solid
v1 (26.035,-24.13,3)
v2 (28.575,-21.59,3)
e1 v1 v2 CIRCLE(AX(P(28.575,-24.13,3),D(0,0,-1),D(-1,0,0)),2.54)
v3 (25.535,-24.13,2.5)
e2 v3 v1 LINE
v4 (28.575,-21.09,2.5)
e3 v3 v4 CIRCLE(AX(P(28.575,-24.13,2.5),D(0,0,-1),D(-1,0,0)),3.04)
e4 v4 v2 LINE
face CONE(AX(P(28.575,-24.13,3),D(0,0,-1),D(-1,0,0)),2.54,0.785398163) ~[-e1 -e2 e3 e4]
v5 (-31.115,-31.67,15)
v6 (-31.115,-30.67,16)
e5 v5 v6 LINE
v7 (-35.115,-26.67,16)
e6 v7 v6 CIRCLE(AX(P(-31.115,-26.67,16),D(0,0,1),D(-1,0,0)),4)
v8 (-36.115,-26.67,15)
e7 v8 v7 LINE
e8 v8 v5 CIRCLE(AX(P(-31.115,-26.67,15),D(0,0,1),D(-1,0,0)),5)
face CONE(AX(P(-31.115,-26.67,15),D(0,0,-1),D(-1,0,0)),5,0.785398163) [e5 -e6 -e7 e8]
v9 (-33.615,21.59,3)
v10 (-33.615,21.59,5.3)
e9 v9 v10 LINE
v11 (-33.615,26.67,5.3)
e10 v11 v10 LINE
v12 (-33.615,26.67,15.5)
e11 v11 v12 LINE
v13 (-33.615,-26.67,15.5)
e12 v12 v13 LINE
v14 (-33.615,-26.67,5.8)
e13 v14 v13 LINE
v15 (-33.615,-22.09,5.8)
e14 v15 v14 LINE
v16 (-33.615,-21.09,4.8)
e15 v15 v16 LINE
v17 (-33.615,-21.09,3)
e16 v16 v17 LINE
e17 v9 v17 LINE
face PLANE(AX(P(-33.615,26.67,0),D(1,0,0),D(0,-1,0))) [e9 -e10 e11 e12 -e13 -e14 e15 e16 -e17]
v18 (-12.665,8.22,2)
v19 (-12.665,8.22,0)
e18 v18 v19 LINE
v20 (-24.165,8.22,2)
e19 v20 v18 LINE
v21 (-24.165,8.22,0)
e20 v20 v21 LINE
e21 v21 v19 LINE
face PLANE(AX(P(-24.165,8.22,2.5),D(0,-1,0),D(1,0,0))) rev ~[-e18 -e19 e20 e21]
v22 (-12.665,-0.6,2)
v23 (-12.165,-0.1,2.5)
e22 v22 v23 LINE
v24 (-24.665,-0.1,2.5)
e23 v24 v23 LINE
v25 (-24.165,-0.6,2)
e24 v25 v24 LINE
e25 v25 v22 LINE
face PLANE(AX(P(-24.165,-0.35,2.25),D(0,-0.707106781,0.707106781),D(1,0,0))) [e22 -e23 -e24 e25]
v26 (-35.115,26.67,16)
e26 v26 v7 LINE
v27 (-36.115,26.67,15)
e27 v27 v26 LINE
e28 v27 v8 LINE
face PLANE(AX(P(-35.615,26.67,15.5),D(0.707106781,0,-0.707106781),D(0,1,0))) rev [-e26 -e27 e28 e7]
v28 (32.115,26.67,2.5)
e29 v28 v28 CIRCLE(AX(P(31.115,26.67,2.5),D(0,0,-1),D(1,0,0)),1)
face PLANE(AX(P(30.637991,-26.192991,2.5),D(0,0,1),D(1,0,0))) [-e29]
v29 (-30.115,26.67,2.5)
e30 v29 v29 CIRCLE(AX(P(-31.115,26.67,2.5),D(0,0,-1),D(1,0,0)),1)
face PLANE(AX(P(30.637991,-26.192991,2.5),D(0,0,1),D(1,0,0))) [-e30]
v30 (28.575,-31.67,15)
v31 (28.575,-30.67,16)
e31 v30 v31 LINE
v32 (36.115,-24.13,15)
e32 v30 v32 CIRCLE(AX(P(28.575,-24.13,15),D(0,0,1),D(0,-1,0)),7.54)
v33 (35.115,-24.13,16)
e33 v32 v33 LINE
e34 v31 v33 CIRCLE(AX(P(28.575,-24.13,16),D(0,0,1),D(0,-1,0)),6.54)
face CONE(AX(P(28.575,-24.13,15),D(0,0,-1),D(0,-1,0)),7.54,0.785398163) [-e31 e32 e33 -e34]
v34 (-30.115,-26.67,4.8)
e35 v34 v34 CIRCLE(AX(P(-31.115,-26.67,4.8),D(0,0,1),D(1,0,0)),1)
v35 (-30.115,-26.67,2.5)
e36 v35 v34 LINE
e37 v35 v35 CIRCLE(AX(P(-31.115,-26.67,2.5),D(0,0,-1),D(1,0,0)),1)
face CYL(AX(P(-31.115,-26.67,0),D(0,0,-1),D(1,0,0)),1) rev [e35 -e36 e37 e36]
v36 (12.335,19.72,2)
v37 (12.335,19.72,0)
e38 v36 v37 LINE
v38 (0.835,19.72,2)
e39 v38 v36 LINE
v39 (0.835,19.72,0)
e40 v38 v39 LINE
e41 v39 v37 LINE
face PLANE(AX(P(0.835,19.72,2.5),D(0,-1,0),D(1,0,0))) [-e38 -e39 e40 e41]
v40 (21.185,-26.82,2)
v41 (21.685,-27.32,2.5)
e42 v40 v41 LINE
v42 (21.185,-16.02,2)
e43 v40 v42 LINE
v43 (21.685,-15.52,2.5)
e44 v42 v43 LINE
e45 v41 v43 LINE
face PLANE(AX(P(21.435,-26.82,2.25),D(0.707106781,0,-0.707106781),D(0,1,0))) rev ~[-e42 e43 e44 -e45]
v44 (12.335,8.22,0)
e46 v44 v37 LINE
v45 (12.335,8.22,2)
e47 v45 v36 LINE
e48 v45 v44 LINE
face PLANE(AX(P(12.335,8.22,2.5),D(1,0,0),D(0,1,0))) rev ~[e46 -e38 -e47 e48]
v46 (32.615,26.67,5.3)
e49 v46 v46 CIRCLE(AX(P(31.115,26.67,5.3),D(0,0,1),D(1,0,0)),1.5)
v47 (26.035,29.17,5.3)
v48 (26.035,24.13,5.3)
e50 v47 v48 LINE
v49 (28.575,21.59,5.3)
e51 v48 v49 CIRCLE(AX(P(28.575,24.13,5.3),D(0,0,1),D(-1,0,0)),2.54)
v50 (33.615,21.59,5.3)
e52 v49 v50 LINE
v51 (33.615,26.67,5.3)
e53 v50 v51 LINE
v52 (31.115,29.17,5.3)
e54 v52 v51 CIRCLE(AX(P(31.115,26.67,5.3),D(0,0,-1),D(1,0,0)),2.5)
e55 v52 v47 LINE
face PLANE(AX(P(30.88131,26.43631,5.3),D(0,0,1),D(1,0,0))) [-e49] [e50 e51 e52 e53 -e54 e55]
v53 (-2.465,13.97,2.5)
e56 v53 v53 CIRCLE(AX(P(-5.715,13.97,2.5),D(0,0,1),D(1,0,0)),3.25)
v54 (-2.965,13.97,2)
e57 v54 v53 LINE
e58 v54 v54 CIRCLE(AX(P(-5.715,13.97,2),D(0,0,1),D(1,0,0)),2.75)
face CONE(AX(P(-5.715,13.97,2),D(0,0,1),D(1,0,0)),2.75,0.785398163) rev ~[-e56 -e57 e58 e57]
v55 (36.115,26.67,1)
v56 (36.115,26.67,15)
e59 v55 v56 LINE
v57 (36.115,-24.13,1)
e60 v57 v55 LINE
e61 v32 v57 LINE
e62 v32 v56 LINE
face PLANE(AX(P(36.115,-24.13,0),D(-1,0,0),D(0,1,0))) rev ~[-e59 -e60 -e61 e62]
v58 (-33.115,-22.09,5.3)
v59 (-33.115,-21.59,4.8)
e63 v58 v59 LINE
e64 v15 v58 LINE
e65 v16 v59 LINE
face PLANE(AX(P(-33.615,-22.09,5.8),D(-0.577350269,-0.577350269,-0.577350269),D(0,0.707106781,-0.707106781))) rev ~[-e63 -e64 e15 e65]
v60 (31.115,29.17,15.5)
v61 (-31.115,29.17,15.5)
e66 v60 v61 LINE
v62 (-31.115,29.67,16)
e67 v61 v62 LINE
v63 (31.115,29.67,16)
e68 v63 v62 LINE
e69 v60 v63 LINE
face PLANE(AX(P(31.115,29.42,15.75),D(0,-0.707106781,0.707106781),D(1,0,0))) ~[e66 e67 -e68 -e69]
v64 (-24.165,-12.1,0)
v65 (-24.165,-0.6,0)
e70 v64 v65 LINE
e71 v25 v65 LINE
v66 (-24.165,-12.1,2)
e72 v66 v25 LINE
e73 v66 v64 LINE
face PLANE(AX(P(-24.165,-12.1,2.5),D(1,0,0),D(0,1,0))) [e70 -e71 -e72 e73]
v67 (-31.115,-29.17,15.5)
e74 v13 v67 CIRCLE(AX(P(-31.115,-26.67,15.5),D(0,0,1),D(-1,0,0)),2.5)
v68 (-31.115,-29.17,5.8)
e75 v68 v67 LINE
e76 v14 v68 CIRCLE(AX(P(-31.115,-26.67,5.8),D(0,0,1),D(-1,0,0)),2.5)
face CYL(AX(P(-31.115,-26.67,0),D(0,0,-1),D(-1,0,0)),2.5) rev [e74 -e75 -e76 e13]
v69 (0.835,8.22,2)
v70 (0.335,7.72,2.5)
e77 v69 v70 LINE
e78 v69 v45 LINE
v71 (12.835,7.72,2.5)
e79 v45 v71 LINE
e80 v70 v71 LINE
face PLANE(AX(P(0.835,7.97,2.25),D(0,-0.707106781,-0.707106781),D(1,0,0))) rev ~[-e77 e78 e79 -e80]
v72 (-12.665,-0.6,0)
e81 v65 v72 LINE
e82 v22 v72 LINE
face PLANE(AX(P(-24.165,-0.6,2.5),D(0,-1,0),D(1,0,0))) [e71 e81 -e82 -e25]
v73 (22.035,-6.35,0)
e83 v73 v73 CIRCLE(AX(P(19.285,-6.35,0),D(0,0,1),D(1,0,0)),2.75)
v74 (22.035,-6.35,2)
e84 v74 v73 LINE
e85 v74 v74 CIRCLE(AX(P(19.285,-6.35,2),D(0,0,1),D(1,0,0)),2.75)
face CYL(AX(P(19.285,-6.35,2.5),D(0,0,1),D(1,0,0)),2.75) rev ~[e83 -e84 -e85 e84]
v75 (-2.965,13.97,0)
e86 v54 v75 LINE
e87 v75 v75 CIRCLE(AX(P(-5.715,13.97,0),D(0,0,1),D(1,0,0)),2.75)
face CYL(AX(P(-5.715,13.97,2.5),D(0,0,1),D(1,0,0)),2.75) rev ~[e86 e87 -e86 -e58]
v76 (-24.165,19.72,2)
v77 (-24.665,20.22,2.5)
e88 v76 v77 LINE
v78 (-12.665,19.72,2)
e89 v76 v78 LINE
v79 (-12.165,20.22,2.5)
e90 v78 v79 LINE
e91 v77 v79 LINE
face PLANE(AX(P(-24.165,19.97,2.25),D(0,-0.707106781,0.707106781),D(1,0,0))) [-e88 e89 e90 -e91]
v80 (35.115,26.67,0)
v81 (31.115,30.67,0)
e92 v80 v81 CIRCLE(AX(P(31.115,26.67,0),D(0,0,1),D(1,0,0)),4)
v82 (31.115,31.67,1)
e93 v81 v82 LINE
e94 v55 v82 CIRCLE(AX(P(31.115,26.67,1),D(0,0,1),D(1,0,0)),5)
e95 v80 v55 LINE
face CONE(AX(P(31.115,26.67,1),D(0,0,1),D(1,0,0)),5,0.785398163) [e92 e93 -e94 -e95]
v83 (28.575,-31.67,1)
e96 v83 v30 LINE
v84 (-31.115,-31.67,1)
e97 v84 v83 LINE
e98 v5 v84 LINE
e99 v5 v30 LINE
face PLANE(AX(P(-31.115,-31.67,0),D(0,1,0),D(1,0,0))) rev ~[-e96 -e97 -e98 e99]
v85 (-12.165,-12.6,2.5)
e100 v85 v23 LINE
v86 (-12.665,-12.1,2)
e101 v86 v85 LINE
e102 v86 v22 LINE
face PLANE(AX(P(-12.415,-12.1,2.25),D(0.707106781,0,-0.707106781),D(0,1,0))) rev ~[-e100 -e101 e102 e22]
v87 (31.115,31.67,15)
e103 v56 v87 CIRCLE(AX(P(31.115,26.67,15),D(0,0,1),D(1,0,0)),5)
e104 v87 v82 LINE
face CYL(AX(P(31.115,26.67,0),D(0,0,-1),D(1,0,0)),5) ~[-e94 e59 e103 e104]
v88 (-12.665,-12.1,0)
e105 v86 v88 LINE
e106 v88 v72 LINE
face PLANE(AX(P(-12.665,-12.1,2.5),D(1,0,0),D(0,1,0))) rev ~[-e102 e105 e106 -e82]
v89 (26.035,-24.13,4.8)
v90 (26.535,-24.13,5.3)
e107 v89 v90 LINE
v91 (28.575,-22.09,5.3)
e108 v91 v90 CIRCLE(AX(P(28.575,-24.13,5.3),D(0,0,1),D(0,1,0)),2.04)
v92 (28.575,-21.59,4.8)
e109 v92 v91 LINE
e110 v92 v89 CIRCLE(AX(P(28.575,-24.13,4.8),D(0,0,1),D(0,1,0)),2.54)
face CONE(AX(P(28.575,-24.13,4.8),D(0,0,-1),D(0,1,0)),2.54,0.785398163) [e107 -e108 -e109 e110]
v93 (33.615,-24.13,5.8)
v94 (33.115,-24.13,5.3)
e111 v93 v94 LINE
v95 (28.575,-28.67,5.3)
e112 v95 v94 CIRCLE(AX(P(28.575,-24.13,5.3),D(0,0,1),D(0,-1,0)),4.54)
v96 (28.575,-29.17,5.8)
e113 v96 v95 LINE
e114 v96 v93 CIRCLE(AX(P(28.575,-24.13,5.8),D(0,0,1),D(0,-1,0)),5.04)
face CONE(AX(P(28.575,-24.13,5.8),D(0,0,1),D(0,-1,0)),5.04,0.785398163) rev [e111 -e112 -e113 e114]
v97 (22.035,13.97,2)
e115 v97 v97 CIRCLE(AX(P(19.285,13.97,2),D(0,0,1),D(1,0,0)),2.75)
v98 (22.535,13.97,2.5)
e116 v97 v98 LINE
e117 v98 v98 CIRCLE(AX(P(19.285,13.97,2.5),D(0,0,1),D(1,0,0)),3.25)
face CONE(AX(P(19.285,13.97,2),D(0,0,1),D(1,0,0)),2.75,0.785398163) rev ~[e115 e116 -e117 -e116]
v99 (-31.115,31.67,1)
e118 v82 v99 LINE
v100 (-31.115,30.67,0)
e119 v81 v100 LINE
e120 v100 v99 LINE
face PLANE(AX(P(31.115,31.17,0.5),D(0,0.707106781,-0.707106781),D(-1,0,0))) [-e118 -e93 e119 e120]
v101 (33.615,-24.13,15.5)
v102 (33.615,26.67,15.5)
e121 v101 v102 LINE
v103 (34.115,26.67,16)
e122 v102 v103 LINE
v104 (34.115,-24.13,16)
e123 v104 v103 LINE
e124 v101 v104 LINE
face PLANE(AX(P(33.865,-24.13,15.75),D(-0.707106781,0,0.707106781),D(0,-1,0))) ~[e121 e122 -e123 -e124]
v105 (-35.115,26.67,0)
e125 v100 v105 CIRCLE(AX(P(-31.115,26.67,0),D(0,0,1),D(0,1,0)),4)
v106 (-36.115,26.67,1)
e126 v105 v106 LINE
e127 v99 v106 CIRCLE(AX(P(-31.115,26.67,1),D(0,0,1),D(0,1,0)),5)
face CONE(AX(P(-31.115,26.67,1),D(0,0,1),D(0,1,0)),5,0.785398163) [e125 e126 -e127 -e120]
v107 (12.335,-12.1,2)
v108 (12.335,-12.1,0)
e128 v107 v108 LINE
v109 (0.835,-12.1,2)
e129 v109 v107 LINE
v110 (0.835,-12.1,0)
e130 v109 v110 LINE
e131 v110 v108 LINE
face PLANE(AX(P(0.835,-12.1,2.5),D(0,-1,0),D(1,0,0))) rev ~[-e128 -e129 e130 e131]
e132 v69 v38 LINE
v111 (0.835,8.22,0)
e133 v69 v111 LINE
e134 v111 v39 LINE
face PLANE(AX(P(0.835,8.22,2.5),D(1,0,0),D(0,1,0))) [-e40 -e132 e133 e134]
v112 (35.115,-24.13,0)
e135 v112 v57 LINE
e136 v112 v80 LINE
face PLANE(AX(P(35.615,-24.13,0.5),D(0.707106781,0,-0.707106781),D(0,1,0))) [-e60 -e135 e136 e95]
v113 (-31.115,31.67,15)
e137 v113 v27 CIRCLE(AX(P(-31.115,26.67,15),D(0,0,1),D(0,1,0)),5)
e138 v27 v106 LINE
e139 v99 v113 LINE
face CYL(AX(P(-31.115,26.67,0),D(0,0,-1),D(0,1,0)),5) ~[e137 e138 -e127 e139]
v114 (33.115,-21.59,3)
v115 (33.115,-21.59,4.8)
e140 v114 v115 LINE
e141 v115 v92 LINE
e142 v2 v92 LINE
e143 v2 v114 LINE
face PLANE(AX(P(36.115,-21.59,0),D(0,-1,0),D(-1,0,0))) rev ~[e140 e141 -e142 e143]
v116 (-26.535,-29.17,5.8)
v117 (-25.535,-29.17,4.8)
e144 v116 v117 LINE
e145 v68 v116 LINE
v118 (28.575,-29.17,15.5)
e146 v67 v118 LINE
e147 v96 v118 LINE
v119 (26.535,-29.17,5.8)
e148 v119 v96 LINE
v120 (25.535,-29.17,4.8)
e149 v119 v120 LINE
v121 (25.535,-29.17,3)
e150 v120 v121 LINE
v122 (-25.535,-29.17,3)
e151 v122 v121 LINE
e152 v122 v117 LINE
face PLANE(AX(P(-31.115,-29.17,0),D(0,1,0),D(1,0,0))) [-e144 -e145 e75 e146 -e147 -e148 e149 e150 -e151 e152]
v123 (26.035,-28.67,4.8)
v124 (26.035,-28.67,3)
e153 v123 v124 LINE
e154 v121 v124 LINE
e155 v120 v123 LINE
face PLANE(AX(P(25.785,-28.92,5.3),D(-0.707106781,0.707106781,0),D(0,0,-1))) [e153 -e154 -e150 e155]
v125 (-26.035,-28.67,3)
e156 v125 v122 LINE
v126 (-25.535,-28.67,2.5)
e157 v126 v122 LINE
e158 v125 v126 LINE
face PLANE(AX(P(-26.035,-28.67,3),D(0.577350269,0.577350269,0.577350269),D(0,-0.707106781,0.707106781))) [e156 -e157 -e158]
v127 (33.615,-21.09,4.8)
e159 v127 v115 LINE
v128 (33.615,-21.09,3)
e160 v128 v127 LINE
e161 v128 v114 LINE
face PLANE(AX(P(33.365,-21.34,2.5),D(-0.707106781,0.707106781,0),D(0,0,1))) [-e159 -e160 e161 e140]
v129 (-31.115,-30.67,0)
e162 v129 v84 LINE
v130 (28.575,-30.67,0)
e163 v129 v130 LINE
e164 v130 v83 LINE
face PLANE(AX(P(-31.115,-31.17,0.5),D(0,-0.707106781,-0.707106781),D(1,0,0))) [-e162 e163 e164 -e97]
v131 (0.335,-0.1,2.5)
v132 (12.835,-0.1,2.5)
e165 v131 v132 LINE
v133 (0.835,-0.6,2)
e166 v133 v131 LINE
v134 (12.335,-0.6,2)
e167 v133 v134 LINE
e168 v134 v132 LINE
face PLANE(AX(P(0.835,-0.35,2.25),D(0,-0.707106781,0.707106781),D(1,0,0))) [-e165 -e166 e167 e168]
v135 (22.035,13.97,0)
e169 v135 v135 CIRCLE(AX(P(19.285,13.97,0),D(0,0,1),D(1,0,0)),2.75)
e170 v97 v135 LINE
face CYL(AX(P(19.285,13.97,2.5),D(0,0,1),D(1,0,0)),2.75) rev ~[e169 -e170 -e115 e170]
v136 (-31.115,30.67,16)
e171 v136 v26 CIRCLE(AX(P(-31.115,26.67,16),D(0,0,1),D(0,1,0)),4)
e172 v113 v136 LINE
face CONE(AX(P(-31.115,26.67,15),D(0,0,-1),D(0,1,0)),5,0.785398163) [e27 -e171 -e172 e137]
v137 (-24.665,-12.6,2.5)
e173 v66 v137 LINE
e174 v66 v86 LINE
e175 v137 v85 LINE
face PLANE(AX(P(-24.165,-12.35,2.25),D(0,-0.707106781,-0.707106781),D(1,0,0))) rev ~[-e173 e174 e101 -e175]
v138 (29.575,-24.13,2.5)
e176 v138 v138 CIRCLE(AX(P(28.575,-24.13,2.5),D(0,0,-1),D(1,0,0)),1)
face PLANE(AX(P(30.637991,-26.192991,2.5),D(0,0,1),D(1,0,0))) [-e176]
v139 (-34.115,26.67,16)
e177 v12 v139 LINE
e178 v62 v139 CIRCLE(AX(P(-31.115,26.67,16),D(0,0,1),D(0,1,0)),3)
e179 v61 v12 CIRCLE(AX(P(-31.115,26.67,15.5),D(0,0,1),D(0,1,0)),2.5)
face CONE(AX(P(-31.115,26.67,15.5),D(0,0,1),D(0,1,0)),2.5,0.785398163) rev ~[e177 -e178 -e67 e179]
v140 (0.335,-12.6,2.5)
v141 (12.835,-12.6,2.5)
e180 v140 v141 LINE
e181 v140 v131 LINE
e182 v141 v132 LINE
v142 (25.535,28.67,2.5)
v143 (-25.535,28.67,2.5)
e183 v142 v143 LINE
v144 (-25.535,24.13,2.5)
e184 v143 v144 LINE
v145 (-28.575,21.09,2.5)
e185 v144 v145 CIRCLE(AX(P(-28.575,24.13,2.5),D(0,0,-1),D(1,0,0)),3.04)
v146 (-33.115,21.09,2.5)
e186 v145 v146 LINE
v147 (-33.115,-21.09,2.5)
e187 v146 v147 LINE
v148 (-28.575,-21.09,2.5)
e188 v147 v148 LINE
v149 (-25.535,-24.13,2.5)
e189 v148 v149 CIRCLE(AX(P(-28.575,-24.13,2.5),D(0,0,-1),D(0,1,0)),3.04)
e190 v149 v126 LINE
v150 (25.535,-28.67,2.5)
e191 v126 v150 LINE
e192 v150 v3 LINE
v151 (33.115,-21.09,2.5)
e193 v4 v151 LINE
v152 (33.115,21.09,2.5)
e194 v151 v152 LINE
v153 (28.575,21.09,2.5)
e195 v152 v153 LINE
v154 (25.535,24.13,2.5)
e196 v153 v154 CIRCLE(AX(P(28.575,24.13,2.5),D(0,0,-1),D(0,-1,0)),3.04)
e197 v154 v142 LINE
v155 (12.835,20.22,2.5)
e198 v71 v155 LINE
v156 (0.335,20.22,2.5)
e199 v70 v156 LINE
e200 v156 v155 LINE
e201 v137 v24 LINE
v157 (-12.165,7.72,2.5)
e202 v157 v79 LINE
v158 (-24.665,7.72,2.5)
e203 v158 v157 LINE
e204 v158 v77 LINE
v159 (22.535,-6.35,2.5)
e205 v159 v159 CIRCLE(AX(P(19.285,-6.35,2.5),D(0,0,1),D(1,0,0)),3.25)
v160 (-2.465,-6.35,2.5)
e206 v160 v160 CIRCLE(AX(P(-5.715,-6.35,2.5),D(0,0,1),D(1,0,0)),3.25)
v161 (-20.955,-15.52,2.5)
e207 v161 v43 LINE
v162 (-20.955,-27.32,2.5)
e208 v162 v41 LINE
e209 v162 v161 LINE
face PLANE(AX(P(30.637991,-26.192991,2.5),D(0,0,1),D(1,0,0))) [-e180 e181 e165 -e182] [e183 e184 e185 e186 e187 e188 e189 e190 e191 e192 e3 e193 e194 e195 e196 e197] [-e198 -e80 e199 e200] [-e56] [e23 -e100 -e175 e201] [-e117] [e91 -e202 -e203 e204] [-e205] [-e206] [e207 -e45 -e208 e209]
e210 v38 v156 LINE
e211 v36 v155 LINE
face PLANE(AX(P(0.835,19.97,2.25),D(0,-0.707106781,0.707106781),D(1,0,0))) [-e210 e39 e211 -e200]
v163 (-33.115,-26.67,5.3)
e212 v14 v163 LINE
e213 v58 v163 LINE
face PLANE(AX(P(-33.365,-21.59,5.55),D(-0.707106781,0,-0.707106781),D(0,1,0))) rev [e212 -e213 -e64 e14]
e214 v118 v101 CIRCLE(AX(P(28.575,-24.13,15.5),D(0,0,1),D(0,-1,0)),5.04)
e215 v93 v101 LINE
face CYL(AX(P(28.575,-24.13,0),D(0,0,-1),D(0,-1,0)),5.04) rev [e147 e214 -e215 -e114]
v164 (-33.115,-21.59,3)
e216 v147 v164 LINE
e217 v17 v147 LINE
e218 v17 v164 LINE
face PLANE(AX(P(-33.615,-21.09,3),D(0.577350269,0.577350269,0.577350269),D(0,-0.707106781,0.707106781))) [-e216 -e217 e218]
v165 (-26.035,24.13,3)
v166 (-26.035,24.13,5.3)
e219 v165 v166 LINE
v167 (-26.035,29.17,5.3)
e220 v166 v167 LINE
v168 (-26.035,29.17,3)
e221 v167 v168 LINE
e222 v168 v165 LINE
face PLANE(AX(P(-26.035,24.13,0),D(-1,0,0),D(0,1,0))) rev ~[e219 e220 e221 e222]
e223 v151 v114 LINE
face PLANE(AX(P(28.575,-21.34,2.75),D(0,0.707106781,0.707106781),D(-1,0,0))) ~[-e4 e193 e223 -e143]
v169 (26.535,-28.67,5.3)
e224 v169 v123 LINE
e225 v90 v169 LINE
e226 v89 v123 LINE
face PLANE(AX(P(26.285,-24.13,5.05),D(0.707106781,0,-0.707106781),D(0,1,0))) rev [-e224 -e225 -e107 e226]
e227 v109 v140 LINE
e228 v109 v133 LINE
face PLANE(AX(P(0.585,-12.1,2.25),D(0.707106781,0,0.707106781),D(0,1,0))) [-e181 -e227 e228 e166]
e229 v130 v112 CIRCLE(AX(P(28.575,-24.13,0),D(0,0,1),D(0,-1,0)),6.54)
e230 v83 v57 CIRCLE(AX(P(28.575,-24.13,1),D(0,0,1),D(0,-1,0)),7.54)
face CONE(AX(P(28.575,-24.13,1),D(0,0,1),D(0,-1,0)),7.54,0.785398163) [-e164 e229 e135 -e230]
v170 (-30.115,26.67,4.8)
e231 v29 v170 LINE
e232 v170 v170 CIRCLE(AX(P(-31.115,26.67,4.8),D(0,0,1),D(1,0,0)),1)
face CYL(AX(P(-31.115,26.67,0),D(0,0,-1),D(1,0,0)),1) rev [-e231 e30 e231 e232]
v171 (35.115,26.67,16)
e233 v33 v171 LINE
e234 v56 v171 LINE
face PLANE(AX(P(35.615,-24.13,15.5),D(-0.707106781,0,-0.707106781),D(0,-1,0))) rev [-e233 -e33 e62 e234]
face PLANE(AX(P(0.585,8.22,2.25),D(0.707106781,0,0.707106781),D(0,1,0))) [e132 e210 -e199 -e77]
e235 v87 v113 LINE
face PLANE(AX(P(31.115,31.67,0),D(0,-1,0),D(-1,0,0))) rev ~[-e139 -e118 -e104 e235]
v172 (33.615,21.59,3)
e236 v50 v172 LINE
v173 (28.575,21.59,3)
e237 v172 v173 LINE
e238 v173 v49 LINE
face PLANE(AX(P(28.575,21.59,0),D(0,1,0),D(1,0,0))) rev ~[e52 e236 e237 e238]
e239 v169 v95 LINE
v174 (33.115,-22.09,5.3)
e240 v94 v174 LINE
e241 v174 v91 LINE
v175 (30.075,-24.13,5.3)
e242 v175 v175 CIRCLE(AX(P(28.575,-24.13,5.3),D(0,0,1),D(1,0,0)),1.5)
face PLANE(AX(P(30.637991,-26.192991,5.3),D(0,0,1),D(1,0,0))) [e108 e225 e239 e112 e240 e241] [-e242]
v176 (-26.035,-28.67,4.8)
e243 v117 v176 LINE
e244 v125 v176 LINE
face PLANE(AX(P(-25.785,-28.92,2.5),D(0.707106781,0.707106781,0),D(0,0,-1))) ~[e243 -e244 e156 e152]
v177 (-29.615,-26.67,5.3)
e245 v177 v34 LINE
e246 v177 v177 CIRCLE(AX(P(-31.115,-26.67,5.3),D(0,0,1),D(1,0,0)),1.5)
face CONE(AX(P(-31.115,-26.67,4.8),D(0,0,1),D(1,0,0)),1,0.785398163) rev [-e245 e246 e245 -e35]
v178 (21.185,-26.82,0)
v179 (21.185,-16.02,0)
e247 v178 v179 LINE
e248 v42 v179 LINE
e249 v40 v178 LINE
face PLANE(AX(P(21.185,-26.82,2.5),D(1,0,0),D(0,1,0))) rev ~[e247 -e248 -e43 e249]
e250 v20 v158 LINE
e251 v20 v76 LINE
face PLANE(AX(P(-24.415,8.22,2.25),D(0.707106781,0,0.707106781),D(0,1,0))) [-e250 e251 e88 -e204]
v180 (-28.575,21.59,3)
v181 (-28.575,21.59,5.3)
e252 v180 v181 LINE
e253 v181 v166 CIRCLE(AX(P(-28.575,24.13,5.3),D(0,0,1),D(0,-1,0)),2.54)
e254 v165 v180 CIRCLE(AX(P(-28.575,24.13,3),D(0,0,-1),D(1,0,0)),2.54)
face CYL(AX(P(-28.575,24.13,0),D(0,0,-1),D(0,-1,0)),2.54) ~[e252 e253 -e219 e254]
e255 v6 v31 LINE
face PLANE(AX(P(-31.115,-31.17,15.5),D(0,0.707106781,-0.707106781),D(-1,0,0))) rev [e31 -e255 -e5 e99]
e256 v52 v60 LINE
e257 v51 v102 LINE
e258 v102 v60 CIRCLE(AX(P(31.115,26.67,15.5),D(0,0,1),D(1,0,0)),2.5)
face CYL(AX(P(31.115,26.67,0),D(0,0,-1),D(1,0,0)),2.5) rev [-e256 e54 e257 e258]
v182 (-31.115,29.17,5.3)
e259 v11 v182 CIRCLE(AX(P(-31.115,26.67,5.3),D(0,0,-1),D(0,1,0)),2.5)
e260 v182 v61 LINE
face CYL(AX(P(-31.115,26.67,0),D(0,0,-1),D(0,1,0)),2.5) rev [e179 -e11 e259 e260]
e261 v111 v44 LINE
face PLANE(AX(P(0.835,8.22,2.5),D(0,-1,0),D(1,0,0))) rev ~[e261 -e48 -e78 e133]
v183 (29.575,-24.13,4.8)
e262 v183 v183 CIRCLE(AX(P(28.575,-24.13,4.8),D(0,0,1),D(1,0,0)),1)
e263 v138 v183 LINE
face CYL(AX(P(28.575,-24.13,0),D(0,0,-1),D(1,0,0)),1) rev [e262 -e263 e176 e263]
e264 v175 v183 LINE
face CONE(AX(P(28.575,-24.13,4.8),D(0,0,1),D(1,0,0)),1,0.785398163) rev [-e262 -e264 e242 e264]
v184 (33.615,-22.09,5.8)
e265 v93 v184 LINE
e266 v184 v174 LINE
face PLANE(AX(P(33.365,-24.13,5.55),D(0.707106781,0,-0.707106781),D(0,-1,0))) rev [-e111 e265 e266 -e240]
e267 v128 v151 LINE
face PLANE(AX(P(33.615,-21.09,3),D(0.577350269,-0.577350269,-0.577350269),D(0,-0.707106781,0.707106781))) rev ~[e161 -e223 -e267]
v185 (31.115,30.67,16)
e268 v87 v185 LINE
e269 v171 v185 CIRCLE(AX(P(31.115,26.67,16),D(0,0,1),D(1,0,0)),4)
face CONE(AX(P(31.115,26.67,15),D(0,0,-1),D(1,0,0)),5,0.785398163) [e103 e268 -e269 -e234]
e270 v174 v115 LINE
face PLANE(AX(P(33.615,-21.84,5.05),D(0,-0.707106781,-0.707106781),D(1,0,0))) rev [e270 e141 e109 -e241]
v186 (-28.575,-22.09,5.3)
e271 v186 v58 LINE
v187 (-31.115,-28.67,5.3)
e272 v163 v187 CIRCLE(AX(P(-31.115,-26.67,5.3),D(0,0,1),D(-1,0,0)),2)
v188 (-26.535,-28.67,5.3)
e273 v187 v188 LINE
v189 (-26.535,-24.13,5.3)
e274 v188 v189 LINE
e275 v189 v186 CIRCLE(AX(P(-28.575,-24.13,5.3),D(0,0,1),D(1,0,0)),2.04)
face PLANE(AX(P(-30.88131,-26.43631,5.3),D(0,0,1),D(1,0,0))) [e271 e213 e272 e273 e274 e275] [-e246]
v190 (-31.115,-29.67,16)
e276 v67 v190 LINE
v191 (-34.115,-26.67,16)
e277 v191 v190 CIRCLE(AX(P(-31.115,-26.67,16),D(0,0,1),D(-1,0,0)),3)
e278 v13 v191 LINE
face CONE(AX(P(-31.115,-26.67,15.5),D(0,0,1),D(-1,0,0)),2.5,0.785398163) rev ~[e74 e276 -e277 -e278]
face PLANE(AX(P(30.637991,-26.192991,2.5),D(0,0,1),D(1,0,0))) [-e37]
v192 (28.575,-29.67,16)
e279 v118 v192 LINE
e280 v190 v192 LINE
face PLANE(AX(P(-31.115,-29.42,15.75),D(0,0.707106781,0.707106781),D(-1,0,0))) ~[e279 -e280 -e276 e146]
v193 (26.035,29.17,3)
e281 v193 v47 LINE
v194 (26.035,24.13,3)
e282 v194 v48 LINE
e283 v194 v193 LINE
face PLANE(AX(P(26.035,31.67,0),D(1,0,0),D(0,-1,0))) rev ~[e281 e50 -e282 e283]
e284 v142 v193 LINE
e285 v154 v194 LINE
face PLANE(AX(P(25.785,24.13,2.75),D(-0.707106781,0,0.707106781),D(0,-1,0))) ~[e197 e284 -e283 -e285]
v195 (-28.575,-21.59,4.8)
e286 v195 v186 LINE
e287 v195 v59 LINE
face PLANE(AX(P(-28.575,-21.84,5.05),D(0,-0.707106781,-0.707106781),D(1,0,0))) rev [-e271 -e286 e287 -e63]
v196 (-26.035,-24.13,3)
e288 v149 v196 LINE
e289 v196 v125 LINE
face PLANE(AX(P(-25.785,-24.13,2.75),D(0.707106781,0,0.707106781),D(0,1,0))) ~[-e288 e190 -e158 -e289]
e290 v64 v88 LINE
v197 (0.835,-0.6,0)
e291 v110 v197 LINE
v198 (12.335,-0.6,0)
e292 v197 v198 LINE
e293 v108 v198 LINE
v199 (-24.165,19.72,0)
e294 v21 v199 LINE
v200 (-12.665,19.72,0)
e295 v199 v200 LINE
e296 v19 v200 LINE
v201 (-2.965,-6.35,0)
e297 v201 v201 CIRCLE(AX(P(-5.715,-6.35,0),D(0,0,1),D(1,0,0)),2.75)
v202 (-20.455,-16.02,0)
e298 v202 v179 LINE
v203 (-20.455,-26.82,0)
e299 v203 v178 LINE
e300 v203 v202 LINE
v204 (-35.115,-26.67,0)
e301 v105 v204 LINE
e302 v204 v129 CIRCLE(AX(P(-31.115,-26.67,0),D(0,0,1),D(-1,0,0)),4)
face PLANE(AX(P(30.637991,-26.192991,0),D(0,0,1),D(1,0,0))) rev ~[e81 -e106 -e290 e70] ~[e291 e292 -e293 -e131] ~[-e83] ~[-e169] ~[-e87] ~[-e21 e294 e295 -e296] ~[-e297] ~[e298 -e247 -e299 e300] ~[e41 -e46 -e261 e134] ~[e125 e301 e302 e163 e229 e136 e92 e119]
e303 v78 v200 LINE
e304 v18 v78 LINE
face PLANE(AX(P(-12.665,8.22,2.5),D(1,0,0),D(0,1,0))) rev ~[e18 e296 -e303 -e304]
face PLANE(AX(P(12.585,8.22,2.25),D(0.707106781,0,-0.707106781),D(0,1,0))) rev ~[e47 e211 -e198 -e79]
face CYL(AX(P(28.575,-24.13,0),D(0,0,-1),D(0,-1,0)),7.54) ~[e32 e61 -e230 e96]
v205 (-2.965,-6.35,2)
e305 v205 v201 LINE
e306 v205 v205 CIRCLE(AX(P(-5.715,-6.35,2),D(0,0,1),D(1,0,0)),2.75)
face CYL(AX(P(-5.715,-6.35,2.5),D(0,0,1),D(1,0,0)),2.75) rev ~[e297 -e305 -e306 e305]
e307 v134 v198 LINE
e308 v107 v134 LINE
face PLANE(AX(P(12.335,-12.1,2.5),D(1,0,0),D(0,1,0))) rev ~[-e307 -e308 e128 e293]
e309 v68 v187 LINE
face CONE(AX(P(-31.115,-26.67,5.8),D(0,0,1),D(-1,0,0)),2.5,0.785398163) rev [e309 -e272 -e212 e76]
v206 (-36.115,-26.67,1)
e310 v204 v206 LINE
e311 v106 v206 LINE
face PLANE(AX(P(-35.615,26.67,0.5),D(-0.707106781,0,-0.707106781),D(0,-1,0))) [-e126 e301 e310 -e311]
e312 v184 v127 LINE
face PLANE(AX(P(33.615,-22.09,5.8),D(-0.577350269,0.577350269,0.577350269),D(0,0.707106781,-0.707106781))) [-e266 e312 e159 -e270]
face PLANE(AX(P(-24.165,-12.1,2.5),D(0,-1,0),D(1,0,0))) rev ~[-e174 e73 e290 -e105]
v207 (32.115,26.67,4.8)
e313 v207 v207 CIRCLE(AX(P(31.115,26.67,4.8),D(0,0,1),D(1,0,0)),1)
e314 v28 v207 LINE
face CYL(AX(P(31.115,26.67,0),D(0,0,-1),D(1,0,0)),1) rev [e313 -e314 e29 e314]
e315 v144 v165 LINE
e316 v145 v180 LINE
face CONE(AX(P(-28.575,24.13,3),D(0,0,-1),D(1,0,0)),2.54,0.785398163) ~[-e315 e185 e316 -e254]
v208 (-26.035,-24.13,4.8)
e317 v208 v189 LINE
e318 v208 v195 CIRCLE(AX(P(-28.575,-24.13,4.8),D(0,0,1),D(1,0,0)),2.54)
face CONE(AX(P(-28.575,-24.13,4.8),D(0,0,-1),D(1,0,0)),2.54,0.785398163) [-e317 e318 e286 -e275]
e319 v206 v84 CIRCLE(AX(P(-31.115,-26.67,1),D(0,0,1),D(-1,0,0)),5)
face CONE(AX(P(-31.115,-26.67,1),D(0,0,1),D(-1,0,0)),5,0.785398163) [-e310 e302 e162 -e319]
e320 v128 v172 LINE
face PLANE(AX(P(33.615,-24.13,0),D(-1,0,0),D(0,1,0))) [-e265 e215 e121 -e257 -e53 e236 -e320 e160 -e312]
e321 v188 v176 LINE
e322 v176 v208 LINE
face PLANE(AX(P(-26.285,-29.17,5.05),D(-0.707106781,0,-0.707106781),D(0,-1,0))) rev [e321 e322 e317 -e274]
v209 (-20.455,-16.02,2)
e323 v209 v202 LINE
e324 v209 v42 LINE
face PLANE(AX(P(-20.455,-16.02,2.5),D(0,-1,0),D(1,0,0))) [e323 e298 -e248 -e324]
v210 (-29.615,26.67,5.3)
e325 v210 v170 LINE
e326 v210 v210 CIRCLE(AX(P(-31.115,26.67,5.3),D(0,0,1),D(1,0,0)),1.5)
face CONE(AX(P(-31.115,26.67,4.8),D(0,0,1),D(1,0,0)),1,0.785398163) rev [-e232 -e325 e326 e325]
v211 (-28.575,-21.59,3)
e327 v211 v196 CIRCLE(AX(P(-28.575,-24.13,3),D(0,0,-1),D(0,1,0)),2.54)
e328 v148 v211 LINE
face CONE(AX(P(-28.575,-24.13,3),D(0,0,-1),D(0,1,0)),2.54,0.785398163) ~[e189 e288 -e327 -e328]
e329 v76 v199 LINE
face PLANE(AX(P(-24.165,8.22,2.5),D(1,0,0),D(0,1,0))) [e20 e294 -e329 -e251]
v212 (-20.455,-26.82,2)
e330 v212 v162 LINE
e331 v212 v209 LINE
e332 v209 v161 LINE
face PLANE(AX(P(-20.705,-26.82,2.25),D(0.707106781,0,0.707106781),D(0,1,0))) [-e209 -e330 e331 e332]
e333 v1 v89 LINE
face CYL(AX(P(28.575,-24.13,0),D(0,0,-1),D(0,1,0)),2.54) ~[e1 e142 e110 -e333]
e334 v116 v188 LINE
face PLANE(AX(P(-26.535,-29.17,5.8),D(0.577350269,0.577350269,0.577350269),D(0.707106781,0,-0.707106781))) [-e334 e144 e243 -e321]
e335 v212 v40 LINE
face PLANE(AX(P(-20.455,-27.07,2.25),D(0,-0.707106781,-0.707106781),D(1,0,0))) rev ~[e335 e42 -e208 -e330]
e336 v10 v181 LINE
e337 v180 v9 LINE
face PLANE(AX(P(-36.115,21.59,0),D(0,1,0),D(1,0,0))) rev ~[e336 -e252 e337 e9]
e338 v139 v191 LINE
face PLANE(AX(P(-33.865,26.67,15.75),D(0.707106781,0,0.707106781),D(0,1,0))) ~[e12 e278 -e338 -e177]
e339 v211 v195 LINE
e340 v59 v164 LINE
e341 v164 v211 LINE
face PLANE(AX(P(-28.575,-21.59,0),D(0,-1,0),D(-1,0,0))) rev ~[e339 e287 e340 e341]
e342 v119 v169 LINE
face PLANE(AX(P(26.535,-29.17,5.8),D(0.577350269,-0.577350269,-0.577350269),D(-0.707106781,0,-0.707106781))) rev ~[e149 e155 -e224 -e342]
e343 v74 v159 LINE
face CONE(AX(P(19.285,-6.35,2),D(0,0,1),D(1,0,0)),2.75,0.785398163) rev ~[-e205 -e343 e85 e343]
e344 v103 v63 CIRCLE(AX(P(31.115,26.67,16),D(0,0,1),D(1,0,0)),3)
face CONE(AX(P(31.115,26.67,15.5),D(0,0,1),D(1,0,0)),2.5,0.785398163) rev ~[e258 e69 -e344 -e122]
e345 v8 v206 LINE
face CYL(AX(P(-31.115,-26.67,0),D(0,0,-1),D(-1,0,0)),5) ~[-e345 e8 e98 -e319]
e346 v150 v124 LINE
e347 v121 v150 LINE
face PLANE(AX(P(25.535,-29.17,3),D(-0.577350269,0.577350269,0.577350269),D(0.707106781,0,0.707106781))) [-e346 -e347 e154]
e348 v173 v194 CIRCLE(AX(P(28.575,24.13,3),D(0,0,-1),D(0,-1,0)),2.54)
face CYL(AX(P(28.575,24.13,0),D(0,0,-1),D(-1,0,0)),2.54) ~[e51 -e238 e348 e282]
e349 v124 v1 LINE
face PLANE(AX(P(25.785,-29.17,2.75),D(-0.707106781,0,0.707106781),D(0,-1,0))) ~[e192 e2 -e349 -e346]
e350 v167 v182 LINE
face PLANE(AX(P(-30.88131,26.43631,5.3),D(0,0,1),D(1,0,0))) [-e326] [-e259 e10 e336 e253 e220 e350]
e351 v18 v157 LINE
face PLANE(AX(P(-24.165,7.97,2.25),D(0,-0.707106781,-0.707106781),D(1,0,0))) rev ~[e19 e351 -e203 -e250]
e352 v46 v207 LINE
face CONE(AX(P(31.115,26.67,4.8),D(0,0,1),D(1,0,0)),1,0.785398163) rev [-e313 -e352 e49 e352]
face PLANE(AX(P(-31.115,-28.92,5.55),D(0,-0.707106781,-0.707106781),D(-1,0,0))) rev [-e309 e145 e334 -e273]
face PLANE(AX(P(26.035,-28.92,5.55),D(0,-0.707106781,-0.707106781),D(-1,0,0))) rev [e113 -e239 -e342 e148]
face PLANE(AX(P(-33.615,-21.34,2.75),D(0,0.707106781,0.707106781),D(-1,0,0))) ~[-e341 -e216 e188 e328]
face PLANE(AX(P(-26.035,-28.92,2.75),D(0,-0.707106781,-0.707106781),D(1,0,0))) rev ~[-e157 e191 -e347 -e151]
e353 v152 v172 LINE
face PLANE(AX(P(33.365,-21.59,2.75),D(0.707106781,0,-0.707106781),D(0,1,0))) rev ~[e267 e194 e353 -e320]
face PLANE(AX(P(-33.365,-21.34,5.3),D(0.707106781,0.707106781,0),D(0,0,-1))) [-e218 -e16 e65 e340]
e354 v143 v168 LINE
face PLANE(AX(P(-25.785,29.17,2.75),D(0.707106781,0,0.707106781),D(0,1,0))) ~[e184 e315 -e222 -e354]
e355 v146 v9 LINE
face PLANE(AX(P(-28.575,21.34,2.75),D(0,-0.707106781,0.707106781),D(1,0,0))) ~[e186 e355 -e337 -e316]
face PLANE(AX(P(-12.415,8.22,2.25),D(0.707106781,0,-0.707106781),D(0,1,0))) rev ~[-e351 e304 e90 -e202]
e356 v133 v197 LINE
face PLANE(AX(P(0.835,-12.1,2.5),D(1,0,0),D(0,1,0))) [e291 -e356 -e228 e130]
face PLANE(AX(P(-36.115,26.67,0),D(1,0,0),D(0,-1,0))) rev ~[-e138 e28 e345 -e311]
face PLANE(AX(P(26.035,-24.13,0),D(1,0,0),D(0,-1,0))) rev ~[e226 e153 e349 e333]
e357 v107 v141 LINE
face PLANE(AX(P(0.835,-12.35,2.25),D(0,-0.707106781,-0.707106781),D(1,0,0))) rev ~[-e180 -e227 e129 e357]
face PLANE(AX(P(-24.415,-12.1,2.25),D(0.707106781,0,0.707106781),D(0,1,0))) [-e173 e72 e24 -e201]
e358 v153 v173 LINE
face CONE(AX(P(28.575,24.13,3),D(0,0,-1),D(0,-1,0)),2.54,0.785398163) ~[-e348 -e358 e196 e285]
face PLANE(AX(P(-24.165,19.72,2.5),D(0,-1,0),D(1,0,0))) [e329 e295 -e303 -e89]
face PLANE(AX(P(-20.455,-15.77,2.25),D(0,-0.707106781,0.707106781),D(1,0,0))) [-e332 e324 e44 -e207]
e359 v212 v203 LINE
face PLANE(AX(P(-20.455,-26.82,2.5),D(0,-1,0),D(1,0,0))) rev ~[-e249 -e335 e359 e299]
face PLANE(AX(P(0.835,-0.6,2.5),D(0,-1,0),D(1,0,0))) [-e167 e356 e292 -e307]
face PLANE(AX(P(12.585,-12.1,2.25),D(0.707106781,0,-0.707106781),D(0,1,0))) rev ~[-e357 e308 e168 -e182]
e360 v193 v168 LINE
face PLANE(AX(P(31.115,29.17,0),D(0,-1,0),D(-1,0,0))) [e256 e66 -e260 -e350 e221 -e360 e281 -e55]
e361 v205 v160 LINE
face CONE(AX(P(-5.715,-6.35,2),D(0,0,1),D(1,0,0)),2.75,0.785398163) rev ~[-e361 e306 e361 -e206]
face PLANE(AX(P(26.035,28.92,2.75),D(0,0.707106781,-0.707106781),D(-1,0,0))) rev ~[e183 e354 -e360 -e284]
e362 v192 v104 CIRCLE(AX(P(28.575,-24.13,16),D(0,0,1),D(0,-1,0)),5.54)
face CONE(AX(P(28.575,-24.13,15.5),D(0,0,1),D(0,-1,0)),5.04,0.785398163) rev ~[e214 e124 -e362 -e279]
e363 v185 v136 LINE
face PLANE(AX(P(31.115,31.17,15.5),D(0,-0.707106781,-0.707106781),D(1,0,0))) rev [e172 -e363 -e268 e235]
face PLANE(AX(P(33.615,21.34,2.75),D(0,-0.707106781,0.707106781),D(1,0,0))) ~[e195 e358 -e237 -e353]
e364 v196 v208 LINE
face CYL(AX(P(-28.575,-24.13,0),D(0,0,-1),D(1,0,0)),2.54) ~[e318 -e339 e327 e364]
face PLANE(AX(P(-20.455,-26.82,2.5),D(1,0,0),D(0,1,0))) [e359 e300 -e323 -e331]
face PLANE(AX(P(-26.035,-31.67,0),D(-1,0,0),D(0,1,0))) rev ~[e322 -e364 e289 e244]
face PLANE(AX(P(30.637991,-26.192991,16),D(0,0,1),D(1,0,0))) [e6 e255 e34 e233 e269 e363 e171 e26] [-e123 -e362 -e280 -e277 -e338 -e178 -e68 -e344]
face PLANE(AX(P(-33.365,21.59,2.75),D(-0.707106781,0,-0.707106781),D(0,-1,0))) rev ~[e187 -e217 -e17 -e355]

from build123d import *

# Parameters (mm, degrees)
F0_R     = 1
F1_DEPTH = 16
F2_T     = -2.5
F3_DEPTH = 5.3
F4_W     = 11.5
F4_H     = 11.5
F4_R     = 2.75
F4_W_2   = 41.64
F4_H_2   = 10.8
F5_DEPTH = 2.501
F6_SIZE  = 1
F7_SIZE  = 0.5


with BuildPart() as f1:
    # F0 (on Top) → F1 (new body)
    with BuildSketch(Plane.XY):
        with BuildLine():
            Line((26.035, -31.67), (28.575, -31.67))
            ThreePointArc((28.575, -31.67), (33.9065851301, -29.4615851301), (36.115, -24.13))
            Line((36.115, -24.13), (36.115, -21.59))
            Line((36.115, -21.59), (28.575, -21.59))
            ThreePointArc((28.575, -21.59), (26.7789487758, -22.3339487758), (26.035, -24.13))
            Line((26.035, -24.13), (26.035, -31.67))
        make_face()
        with Locations((28.575, -24.13)):
            Circle(F0_R, mode=Mode.SUBTRACT)
        with BuildLine():
            Line((-26.035, -31.67), (26.035, -31.67))
            Line((26.035, -31.67), (26.035, -24.13))
            ThreePointArc((26.035, -24.13), (26.7789487758, -22.3339487758), (28.575, -21.59))
            Line((28.575, -21.59), (36.115, -21.59))
            Line((36.115, -21.59), (36.115, 21.59))
            Line((36.115, 21.59), (28.575, 21.59))
            ThreePointArc((28.575, 21.59), (26.7789487758, 22.3339487758), (26.035, 24.13))
            Line((26.035, 24.13), (26.035, 31.67))
            Line((26.035, 31.67), (-26.035, 31.67))
            Line((-26.035, 31.67), (-26.035, 24.13))
            ThreePointArc((-26.035, 24.13), (-26.7789487758, 22.3339487758), (-28.575, 21.59))
            Line((-28.575, 21.59), (-36.115, 21.59))
            Line((-36.115, 21.59), (-36.115, -21.59))
            Line((-36.115, -21.59), (-28.575, -21.59))
            ThreePointArc((-28.575, -21.59), (-26.7789487758, -22.3339487758), (-26.035, -24.13))
            Line((-26.035, -24.13), (-26.035, -31.67))
        make_face()
        with BuildLine():
            Line((-31.115, -31.67), (-26.035, -31.67))
            Line((-26.035, -31.67), (-26.035, -24.13))
            ThreePointArc((-26.035, -24.13), (-26.7789487758, -22.3339487758), (-28.575, -21.59))
            Line((-28.575, -21.59), (-36.115, -21.59))
            Line((-36.115, -21.59), (-36.115, -26.67))
            ThreePointArc((-36.115, -26.67), (-34.6505339059, -30.2055339059), (-31.115, -31.67))
        make_face()
        with Locations((-31.115, -26.67)):
            Circle(F0_R, mode=Mode.SUBTRACT)
        with BuildLine():
            Line((-36.115, 26.67), (-36.115, 21.59))
            Line((-36.115, 21.59), (-28.575, 21.59))
            ThreePointArc((-28.575, 21.59), (-26.7789487758, 22.3339487758), (-26.035, 24.13))
            Line((-26.035, 24.13), (-26.035, 31.67))
            Line((-26.035, 31.67), (-31.115, 31.67))
            ThreePointArc((-31.115, 31.67), (-34.6505339059, 30.2055339059), (-36.115, 26.67))
        make_face()
        with Locations((-31.115, 26.67)):
            Circle(F0_R, mode=Mode.SUBTRACT)
        with BuildLine():
            Line((28.575, 21.59), (36.115, 21.59))
            Line((36.115, 21.59), (36.115, 26.67))
            ThreePointArc((36.115, 26.67), (34.6505339059, 30.2055339059), (31.115, 31.67))
            Line((31.115, 31.67), (26.035, 31.67))
            Line((26.035, 31.67), (26.035, 24.13))
            ThreePointArc((26.035, 24.13), (26.7789487758, 22.3339487758), (28.575, 21.59))
        make_face()
        with Locations((31.115, 26.67)):
            Circle(F0_R, mode=Mode.SUBTRACT)
        with Locations((31.115, 26.67)):
            Circle(F0_R)
        with Locations((-31.115, 26.67)):
            Circle(F0_R)
        with Locations((-31.115, -26.67)):
            Circle(F0_R)
        with Locations((28.575, -24.13)):
            Circle(F0_R)
    extrude(amount=F1_DEPTH)

    # F2
    f2_openings = [f1.faces().sort_by_distance(p)[0] for p in [
        (-0.051092, 0.04441, 16),
    ]]
    offset(amount=F2_T, openings=f2_openings)

    # F0 (on Top) → F3 (join)
    with BuildSketch(Plane.XY):
        with BuildLine():
            Line((-31.115, -31.67), (-26.035, -31.67))
            Line((-26.035, -31.67), (-26.035, -24.13))
            ThreePointArc((-26.035, -24.13), (-26.7789487758, -22.3339487758), (-28.575, -21.59))
            Line((-28.575, -21.59), (-36.115, -21.59))
            Line((-36.115, -21.59), (-36.115, -26.67))
            ThreePointArc((-36.115, -26.67), (-34.6505339059, -30.2055339059), (-31.115, -31.67))
        make_face()
        with Locations((-31.115, -26.67)):
            Circle(F0_R, mode=Mode.SUBTRACT)
        with BuildLine():
            Line((26.035, -31.67), (28.575, -31.67))
            ThreePointArc((28.575, -31.67), (33.9065851301, -29.4615851301), (36.115, -24.13))
            Line((36.115, -24.13), (36.115, -21.59))
            Line((36.115, -21.59), (28.575, -21.59))
            ThreePointArc((28.575, -21.59), (26.7789487758, -22.3339487758), (26.035, -24.13))
            Line((26.035, -24.13), (26.035, -31.67))
        make_face()
        with Locations((28.575, -24.13)):
            Circle(F0_R, mode=Mode.SUBTRACT)
        with BuildLine():
            Line((28.575, 21.59), (36.115, 21.59))
            Line((36.115, 21.59), (36.115, 26.67))
            ThreePointArc((36.115, 26.67), (34.6505339059, 30.2055339059), (31.115, 31.67))
            Line((31.115, 31.67), (26.035, 31.67))
            Line((26.035, 31.67), (26.035, 24.13))
            ThreePointArc((26.035, 24.13), (26.7789487758, 22.3339487758), (28.575, 21.59))
        make_face()
        with Locations((31.115, 26.67)):
            Circle(F0_R, mode=Mode.SUBTRACT)
        with BuildLine():
            Line((-36.115, 26.67), (-36.115, 21.59))
            Line((-36.115, 21.59), (-28.575, 21.59))
            ThreePointArc((-28.575, 21.59), (-26.7789487758, 22.3339487758), (-26.035, 24.13))
            Line((-26.035, 24.13), (-26.035, 31.67))
            Line((-26.035, 31.67), (-31.115, 31.67))
            ThreePointArc((-31.115, 31.67), (-34.6505339059, 30.2055339059), (-36.115, 26.67))
        make_face()
        with Locations((-31.115, 26.67)):
            Circle(F0_R, mode=Mode.SUBTRACT)
    extrude(amount=F3_DEPTH)

    # F4 (on face) → F5 (cut, through all)
    with BuildSketch(Plane.XY.offset(2.5)):
        with Locations((-18.415, 13.97)):
            Rectangle(F4_W, F4_H)
        with Locations((-18.415, -6.35)):
            Rectangle(F4_W, F4_H)
        with Locations((-5.715, 13.97)):
            Circle(F4_R)
        with Locations((-5.715, -6.35)):
            Circle(F4_R)
        with Locations((6.585, -6.35)):
            Rectangle(F4_W, F4_H)
        with Locations((6.585, 13.97)):
            Rectangle(F4_W, F4_H)
        with Locations((19.285, 13.97)):
            Circle(F4_R)
        with Locations((19.285, -6.35)):
            Circle(F4_R)
        with Locations((0.365, -21.42)):
            Rectangle(F4_W_2, F4_H_2)
    extrude(amount=-F5_DEPTH, mode=Mode.SUBTRACT)

    # F6
    f6_edges = [f1.edges().sort_by_distance(p)[0] for p in [
        (-36.115, 0, 16),
        (-34.650534, 30.205534, 16),
        (0, 31.67, 16),
        (34.650534, 30.205534, 16),
        (36.115, 1.27, 16),
        (33.906585, -29.461585, 16),
        (-1.27, -31.67, 16),
        (-34.650534, -30.205534, 0),
        (-34.650534, -30.205534, 16),
        (33.906585, -29.461585, 0),
        (-1.27, -31.67, 0),
        (36.115, 1.27, 0),
        (-36.115, 0, 0),
        (34.650534, 30.205534, 0),
        (-34.650534, 30.205534, 0),
        (0, 31.67, 0),
    ]]
    chamfer(f6_edges, length=F6_SIZE)

    # F7
    f7_edges = [f1.edges().sort_by_distance(p)[0] for p in [
        (-31.095, -21.59, 5.3),
        (-26.778949, -22.333949, 5.3),
        (-26.035, -26.65, 5.3),
        (-28.575, -29.17, 5.3),
        (-32.882767, -28.437767, 5.3),
        (-33.615, -24.13, 5.3),
        (-32.115, -26.67, 5.3),
        (31.095, -21.59, 2.5),
        (26.778949, -22.333949, 2.5),
        (33.615, 0, 2.5),
        (26.035, -26.65, 2.5),
        (31.095, 21.59, 2.5),
        (0, -29.17, 2.5),
        (26.778949, 22.333949, 2.5),
        (-26.035, -26.65, 2.5),
        (26.035, 26.65, 2.5),
        (-26.778949, -22.333949, 2.5),
        (0, 29.17, 2.5),
        (-31.095, -21.59, 2.5),
        (-26.035, 26.65, 2.5),
        (-33.615, 0, 2.5),
        (-26.778949, 22.333949, 2.5),
        (-31.095, 21.59, 2.5),
        (-24.165, -6.35, 2.5),
        (-18.415, -12.1, 2.5),
        (-12.665, -6.35, 2.5),
        (-18.415, -0.6, 2.5),
        (-8.465, -6.35, 2.5),
        (0.365, -16.02, 2.5),
        (-20.455, -21.42, 2.5),
        (0.365, -26.82, 2.5),
        (21.185, -21.42, 2.5),
        (0.835, -6.35, 2.5),
        (6.585, -12.1, 2.5),
        (12.335, -6.35, 2.5),
        (6.585, -0.6, 2.5),
        (16.535, -6.35, 2.5),
        (-18.415, 8.22, 2.5),
        (-12.665, 13.97, 2.5),
        (-18.415, 19.72, 2.5),
        (-24.165, 13.97, 2.5),
        (-8.465, 13.97, 2.5),
        (6.585, 8.22, 2.5),
        (12.335, 13.97, 2.5),
        (6.585, 19.72, 2.5),
        (0.835, 13.97, 2.5),
        (16.535, 13.97, 2.5),
        (-33.615, 0, 16),
        (-32.115, 26.67, 5.3),
        (0, 29.17, 16),
        (-32.882767, 28.437767, 16),
        (32.882767, 28.437767, 16),
        (30.115, 26.67, 5.3),
        (26.035, -26.65, 5.3),
        (26.778949, -22.333949, 5.3),
        (31.095, -21.59, 5.3),
        (33.615, -22.86, 5.3),
        (32.138818, -27.693818, 5.3),
        (27.305, -29.17, 5.3),
        (27.575, -24.13, 5.3),
        (32.138818, -27.693818, 16),
        (-1.27, -29.17, 16),
        (-32.882767, -28.437767, 16),
        (33.615, 1.27, 16),
        (-26.035, -29.17, 3.9),
        (26.035, -29.17, 3.9),
        (-33.615, -21.59, 3.9),
        (33.615, -21.59, 3.9),
    ]]
    chamfer(f7_edges, length=F7_SIZE)


solid = f1.part
